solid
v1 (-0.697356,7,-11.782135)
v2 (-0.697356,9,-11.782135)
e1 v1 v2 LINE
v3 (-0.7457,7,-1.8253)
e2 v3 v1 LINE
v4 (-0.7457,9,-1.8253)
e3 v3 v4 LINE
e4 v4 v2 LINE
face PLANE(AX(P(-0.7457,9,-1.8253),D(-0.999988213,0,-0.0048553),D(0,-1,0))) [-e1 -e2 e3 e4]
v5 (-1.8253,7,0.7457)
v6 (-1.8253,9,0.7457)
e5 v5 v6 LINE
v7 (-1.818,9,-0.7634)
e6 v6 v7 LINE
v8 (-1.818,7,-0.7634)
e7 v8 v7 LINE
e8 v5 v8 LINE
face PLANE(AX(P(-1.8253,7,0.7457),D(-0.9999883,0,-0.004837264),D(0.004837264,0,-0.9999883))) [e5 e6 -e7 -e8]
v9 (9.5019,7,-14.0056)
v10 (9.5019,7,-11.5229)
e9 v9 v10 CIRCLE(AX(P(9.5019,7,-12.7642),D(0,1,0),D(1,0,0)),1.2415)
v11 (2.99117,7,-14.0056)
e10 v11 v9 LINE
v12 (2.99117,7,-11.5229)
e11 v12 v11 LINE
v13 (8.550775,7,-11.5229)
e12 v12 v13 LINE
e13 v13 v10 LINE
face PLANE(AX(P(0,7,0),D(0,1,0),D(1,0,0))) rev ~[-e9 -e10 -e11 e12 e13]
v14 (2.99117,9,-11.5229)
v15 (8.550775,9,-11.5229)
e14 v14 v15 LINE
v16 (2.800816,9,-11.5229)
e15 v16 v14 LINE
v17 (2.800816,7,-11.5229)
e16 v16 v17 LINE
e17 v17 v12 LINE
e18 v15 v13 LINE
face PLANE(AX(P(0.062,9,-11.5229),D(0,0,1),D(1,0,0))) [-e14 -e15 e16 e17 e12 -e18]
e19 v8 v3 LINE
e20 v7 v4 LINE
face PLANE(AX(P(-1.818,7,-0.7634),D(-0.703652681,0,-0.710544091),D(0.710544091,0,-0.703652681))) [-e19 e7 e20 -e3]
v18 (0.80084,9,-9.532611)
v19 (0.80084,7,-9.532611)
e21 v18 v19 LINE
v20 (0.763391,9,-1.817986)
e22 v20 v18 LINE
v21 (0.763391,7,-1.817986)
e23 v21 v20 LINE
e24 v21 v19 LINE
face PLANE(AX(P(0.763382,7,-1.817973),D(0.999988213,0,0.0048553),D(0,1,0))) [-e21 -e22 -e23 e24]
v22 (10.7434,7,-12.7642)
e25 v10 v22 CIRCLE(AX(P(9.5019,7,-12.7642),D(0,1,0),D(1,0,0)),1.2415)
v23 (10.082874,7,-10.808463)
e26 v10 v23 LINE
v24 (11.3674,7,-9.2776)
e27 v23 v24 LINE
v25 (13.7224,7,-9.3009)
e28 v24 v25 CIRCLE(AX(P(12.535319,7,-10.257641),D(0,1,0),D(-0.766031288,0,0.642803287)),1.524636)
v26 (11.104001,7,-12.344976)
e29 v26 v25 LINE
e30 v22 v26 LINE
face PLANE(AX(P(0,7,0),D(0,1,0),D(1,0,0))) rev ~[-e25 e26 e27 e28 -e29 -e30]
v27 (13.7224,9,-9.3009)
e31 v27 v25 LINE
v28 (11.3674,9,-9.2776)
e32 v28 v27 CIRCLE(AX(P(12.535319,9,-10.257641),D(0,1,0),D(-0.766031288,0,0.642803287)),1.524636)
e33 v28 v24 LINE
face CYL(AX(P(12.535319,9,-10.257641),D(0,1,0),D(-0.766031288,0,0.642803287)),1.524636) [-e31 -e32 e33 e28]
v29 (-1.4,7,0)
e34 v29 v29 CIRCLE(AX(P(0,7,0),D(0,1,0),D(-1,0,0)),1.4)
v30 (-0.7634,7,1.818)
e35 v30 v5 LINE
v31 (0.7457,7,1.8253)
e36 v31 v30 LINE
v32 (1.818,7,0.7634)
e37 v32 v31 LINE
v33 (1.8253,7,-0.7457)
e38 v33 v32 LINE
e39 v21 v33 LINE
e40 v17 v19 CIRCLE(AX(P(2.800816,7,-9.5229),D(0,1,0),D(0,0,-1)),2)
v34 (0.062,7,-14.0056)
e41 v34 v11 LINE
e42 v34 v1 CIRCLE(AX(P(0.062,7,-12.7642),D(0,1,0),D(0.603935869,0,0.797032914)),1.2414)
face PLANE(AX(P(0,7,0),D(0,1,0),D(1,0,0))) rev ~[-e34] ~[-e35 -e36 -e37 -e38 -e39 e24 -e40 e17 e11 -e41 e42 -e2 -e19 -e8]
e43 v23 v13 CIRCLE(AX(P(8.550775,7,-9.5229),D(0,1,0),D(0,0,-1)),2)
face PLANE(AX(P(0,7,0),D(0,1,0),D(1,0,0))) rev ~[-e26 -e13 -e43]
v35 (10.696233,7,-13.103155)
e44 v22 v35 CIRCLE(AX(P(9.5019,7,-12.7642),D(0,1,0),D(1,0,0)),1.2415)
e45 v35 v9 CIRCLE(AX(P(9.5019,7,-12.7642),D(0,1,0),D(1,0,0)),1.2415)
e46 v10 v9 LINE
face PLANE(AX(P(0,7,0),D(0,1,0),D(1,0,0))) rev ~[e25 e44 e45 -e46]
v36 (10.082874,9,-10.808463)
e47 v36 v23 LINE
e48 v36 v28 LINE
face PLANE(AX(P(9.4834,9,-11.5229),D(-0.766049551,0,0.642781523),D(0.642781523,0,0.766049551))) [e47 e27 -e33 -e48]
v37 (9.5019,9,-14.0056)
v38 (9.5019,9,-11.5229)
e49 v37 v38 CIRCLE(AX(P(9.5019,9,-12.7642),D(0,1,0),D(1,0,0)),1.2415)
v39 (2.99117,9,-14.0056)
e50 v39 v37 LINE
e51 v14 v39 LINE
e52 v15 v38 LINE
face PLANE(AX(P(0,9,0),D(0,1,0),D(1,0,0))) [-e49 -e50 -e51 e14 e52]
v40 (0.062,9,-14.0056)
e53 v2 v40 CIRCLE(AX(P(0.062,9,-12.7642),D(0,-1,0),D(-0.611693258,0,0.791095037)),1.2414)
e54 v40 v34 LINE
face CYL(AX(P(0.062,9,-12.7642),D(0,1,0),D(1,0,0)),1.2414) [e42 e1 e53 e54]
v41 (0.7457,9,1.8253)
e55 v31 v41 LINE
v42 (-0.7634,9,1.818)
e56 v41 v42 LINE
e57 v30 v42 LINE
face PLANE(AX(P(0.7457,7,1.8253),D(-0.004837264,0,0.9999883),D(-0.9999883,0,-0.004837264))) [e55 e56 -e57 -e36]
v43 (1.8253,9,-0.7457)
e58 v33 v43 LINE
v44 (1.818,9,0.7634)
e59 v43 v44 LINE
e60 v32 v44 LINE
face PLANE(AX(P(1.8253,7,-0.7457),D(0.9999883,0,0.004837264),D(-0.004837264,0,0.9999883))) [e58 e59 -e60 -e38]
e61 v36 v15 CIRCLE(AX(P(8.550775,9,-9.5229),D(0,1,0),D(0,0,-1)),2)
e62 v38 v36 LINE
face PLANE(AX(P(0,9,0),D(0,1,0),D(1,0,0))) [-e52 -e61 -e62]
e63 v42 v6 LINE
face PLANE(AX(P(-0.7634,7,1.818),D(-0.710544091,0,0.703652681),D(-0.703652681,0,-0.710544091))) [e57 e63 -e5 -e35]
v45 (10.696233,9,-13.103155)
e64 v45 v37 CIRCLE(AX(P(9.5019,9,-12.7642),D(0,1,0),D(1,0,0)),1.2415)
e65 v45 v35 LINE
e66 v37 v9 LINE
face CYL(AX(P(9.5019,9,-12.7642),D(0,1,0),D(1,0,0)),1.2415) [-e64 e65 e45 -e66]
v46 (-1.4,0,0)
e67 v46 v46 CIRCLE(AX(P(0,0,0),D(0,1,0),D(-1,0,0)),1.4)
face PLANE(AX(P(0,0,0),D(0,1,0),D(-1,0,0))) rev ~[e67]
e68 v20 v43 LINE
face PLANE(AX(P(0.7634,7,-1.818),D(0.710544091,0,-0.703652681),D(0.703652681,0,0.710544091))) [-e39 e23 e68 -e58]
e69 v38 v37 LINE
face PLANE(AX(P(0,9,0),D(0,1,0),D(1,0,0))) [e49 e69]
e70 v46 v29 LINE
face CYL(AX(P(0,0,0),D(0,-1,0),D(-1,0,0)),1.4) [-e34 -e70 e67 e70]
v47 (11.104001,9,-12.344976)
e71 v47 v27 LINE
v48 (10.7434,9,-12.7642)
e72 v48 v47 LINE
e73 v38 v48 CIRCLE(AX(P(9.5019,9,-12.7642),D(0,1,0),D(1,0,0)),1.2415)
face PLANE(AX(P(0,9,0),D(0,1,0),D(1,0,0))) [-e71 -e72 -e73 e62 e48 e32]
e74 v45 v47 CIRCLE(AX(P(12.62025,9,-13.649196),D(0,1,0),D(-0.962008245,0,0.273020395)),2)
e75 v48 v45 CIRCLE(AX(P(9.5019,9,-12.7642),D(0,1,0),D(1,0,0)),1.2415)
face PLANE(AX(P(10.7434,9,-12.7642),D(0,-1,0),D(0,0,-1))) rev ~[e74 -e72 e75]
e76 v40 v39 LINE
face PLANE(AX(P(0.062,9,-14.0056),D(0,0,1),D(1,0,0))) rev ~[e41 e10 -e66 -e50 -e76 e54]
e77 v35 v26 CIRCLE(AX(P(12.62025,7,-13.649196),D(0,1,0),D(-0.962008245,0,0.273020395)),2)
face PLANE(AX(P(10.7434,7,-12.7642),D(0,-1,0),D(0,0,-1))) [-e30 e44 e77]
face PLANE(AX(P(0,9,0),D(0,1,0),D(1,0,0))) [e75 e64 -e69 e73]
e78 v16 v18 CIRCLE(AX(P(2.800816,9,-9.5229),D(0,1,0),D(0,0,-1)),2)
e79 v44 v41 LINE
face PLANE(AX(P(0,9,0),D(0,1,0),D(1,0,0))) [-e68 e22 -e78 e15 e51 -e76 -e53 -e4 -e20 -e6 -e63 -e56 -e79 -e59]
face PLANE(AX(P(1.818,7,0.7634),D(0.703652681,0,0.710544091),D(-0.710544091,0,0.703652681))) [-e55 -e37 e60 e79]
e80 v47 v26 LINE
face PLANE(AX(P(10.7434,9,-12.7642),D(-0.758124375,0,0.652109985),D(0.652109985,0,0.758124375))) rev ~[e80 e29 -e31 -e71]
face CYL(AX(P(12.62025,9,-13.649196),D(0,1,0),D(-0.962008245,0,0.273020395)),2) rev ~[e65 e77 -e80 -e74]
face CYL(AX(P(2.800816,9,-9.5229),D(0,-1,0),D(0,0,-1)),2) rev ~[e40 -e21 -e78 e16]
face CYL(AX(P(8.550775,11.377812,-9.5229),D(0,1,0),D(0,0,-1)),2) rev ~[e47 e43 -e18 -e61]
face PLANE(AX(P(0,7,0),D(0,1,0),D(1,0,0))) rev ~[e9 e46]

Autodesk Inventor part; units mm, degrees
ref_plane "YZ Plane" through (0, 0, 0) normal (1, 0, 0) x (0, 1, 0)
ref_plane "XZ Plane" through (0, 0, 0) normal (0, 1, 0) x (-1, 0, 0)
ref_plane "XY Plane" through (0, 0, 0) normal (0, 0, 1) x (1, 0, 0)
sketch "Sketch1" plane through (0, 0, 0) normal (0, 1, 0) x (-1, 0, 0)
  circle A0 centre (0, 0) radius 1.4
  dimension "d0" = 2.8
sketch "Sketch2" plane through (0, 0, 0) normal (0, 1, 0) x (-1, 0, 0)
  point P0 (0, 0)
extrude "Extrusion1" add sketch "Sketch1" along normal blind 7
sketch "Sketch3" plane through (0, 7, 0) normal (0, 1, 0) x (1, 0, 0)
  line L0 (1.8253, 0.7457) -> (1.818, -0.7634)
  line L1 (1.818, -0.7634) -> (0.7457, -1.8253)
  line L2 (0.7457, -1.8253) -> (-0.7634, -1.818)
  line L3 (-0.7634, -1.818) -> (-1.8253, -0.7457)
  line L4 (-1.8253, -0.7457) -> (-1.818, 0.7634)
  line L5 (-1.818, 0.7634) -> (-0.7457, 1.8253)
  line L6 (-0.7457, 1.8253) -> (0.7634, 1.818)
  line L7 (0.7634, 1.818) -> (1.8253, 0.7457)
  line L8 (-1.8216, 0.0088) -> (1.8216, -0.0088) construction
  line L9 (-0.0088, -1.8216) -> (0.0088, 1.8216) construction
  point P0 (0, 0)
  point P1 (0, 0)
  point P2 (0, 0)
  point P3 (0, 0)
extrude "Extrusion2" add sketch "Sketch3" along normal blind 2
sketch "Sketch4" plane through (-0.7457, 7, -1.8253) normal (0.0048553, 0, -0.9999882) x (-0.9999882, 0, -0.0048553)
  line L0 (-1.5091, 2) -> (0, 2)
  line L1 (0, 2) -> (0, 0)
  line L2 (0, 0) -> (-1.5091, 0)
  line L3 (-1.5091, 0) -> (-1.5091, 2)
  point P0 (-0.7546, -7)
extrude "Extrusion3" add sketch "Sketch4" along normal blind 10
sketch "Sketch5" plane through (0, 9, 0) normal (0, 1, 0) x (1, 0, 0)
  point P0 (0, 0)
sketch "Sketch6" plane through (0, 9, 0) normal (0, 1, 0) x (1, 0, 0)
  point P0 (0, 0)
thread "Thread1" size "M3x0.5" class "6g" standard "ANSI Metric M Profile" full length
sketch "Sketch7" plane through (0, 9, 0) normal (0, 1, 0) x (1, 0, 0)
  circle A0 centre (0.062, 12.7642) radius 1.2414
  point P0 (0, 0)
extrude "Extrusion4" add sketch "Sketch7" against normal blind 2
sketch "Sketch8" plane through (0, 9, 0) normal (0, 1, 0) x (1, 0, 0)
  point P0 (0, 0)
sketch "Sketch9" plane through (0, 9, 0) normal (0, 1, 0) x (1, 0, 0)
  point P0 (0, 0)
sketch "Sketch10" plane through (0, 9, 0) normal (0, 1, 0) x (1, 0, 0)
  line L0 (10.3239, 13.7463) -> (10.3549, 13.7463)
  point P0 (0, 0)
extrude "Extrusion5" [suppressed]
sketch "Sketch11" plane through (0, 9, 0) normal (0, 1, 0) x (1, 0, 0)
  point P0 (0, 0)
sketch "Sketch12" plane through (0, 9, 0) normal (0, 1, 0) x (1, 0, 0)
  point P0 (0, 0)
sketch "Sketch13" plane through (0, 9, 0) normal (0, 1, 0) x (1, 0, 0)
  line L0 (0.062, 11.5229) -> (9.5019, 11.5229)
  line L1 (0.062, 11.5229) -> (0.062, 14.0056)
  arc A0 (0.8117, 11.7749) -> (-0.6974, 11.7822) centre (0.062, 12.7642) ccw projected
  line L2 (0.062, 14.0056) -> (9.5019, 14.0056)
  line L3 (9.5019, 11.5229) -> (9.5019, 14.0056)
  point P0 (0, 0)
extrude "Extrusion6" add sketch "Sketch13" against normal blind 2
sketch "Sketch14" plane through (0, 9, 0) normal (0, 1, 0) x (1, 0, 0)
  line L0 (9.5019, 14.0056) -> (9.5019, 11.5229) projected
  circle A0 centre (9.5019, 12.7642) radius 1.2415
  point P0 (0, 0)
  dimension "d17" = 2.483
extrude "Extrusion7" add sketch "Sketch14" against normal blind 2
sketch "Sketch15" plane through (0, 9, 0) normal (0, 1, 0) x (1, 0, 0)
  arc A0 (9.4834, 11.5229) -> (9.4834, 14.0056) centre (9.5019, 12.7642) ccw projected
  line L0 (10.7434, 12.7642) -> (13.7224, 9.3009)
  line L1 (9.4834, 11.5229) -> (11.3674, 9.2776)
  line L2 (9.4834, 11.5229) -> (12.4144, 11.5229) construction
  arc A1 (11.3674, 9.2776) -> (13.7224, 9.3009) centre (12.5353, 10.2576) ccw
  point P0 (0, 0)
  dimension "d20" = 50
extrude "Extrusion8" add sketch "Sketch15" against normal blind 2
fillet "Fillet1" radius 2 1 edges at (0.8105, 8, -11.5229)
fillet "Fillet2" radius 2 1 edges at (9.5019, 8, -11.5229)
fillet "Fillet3" radius 2 1 edges at (10.7434, 8, -12.7642)
properties part number "Servo_Arm_Hook_M"
